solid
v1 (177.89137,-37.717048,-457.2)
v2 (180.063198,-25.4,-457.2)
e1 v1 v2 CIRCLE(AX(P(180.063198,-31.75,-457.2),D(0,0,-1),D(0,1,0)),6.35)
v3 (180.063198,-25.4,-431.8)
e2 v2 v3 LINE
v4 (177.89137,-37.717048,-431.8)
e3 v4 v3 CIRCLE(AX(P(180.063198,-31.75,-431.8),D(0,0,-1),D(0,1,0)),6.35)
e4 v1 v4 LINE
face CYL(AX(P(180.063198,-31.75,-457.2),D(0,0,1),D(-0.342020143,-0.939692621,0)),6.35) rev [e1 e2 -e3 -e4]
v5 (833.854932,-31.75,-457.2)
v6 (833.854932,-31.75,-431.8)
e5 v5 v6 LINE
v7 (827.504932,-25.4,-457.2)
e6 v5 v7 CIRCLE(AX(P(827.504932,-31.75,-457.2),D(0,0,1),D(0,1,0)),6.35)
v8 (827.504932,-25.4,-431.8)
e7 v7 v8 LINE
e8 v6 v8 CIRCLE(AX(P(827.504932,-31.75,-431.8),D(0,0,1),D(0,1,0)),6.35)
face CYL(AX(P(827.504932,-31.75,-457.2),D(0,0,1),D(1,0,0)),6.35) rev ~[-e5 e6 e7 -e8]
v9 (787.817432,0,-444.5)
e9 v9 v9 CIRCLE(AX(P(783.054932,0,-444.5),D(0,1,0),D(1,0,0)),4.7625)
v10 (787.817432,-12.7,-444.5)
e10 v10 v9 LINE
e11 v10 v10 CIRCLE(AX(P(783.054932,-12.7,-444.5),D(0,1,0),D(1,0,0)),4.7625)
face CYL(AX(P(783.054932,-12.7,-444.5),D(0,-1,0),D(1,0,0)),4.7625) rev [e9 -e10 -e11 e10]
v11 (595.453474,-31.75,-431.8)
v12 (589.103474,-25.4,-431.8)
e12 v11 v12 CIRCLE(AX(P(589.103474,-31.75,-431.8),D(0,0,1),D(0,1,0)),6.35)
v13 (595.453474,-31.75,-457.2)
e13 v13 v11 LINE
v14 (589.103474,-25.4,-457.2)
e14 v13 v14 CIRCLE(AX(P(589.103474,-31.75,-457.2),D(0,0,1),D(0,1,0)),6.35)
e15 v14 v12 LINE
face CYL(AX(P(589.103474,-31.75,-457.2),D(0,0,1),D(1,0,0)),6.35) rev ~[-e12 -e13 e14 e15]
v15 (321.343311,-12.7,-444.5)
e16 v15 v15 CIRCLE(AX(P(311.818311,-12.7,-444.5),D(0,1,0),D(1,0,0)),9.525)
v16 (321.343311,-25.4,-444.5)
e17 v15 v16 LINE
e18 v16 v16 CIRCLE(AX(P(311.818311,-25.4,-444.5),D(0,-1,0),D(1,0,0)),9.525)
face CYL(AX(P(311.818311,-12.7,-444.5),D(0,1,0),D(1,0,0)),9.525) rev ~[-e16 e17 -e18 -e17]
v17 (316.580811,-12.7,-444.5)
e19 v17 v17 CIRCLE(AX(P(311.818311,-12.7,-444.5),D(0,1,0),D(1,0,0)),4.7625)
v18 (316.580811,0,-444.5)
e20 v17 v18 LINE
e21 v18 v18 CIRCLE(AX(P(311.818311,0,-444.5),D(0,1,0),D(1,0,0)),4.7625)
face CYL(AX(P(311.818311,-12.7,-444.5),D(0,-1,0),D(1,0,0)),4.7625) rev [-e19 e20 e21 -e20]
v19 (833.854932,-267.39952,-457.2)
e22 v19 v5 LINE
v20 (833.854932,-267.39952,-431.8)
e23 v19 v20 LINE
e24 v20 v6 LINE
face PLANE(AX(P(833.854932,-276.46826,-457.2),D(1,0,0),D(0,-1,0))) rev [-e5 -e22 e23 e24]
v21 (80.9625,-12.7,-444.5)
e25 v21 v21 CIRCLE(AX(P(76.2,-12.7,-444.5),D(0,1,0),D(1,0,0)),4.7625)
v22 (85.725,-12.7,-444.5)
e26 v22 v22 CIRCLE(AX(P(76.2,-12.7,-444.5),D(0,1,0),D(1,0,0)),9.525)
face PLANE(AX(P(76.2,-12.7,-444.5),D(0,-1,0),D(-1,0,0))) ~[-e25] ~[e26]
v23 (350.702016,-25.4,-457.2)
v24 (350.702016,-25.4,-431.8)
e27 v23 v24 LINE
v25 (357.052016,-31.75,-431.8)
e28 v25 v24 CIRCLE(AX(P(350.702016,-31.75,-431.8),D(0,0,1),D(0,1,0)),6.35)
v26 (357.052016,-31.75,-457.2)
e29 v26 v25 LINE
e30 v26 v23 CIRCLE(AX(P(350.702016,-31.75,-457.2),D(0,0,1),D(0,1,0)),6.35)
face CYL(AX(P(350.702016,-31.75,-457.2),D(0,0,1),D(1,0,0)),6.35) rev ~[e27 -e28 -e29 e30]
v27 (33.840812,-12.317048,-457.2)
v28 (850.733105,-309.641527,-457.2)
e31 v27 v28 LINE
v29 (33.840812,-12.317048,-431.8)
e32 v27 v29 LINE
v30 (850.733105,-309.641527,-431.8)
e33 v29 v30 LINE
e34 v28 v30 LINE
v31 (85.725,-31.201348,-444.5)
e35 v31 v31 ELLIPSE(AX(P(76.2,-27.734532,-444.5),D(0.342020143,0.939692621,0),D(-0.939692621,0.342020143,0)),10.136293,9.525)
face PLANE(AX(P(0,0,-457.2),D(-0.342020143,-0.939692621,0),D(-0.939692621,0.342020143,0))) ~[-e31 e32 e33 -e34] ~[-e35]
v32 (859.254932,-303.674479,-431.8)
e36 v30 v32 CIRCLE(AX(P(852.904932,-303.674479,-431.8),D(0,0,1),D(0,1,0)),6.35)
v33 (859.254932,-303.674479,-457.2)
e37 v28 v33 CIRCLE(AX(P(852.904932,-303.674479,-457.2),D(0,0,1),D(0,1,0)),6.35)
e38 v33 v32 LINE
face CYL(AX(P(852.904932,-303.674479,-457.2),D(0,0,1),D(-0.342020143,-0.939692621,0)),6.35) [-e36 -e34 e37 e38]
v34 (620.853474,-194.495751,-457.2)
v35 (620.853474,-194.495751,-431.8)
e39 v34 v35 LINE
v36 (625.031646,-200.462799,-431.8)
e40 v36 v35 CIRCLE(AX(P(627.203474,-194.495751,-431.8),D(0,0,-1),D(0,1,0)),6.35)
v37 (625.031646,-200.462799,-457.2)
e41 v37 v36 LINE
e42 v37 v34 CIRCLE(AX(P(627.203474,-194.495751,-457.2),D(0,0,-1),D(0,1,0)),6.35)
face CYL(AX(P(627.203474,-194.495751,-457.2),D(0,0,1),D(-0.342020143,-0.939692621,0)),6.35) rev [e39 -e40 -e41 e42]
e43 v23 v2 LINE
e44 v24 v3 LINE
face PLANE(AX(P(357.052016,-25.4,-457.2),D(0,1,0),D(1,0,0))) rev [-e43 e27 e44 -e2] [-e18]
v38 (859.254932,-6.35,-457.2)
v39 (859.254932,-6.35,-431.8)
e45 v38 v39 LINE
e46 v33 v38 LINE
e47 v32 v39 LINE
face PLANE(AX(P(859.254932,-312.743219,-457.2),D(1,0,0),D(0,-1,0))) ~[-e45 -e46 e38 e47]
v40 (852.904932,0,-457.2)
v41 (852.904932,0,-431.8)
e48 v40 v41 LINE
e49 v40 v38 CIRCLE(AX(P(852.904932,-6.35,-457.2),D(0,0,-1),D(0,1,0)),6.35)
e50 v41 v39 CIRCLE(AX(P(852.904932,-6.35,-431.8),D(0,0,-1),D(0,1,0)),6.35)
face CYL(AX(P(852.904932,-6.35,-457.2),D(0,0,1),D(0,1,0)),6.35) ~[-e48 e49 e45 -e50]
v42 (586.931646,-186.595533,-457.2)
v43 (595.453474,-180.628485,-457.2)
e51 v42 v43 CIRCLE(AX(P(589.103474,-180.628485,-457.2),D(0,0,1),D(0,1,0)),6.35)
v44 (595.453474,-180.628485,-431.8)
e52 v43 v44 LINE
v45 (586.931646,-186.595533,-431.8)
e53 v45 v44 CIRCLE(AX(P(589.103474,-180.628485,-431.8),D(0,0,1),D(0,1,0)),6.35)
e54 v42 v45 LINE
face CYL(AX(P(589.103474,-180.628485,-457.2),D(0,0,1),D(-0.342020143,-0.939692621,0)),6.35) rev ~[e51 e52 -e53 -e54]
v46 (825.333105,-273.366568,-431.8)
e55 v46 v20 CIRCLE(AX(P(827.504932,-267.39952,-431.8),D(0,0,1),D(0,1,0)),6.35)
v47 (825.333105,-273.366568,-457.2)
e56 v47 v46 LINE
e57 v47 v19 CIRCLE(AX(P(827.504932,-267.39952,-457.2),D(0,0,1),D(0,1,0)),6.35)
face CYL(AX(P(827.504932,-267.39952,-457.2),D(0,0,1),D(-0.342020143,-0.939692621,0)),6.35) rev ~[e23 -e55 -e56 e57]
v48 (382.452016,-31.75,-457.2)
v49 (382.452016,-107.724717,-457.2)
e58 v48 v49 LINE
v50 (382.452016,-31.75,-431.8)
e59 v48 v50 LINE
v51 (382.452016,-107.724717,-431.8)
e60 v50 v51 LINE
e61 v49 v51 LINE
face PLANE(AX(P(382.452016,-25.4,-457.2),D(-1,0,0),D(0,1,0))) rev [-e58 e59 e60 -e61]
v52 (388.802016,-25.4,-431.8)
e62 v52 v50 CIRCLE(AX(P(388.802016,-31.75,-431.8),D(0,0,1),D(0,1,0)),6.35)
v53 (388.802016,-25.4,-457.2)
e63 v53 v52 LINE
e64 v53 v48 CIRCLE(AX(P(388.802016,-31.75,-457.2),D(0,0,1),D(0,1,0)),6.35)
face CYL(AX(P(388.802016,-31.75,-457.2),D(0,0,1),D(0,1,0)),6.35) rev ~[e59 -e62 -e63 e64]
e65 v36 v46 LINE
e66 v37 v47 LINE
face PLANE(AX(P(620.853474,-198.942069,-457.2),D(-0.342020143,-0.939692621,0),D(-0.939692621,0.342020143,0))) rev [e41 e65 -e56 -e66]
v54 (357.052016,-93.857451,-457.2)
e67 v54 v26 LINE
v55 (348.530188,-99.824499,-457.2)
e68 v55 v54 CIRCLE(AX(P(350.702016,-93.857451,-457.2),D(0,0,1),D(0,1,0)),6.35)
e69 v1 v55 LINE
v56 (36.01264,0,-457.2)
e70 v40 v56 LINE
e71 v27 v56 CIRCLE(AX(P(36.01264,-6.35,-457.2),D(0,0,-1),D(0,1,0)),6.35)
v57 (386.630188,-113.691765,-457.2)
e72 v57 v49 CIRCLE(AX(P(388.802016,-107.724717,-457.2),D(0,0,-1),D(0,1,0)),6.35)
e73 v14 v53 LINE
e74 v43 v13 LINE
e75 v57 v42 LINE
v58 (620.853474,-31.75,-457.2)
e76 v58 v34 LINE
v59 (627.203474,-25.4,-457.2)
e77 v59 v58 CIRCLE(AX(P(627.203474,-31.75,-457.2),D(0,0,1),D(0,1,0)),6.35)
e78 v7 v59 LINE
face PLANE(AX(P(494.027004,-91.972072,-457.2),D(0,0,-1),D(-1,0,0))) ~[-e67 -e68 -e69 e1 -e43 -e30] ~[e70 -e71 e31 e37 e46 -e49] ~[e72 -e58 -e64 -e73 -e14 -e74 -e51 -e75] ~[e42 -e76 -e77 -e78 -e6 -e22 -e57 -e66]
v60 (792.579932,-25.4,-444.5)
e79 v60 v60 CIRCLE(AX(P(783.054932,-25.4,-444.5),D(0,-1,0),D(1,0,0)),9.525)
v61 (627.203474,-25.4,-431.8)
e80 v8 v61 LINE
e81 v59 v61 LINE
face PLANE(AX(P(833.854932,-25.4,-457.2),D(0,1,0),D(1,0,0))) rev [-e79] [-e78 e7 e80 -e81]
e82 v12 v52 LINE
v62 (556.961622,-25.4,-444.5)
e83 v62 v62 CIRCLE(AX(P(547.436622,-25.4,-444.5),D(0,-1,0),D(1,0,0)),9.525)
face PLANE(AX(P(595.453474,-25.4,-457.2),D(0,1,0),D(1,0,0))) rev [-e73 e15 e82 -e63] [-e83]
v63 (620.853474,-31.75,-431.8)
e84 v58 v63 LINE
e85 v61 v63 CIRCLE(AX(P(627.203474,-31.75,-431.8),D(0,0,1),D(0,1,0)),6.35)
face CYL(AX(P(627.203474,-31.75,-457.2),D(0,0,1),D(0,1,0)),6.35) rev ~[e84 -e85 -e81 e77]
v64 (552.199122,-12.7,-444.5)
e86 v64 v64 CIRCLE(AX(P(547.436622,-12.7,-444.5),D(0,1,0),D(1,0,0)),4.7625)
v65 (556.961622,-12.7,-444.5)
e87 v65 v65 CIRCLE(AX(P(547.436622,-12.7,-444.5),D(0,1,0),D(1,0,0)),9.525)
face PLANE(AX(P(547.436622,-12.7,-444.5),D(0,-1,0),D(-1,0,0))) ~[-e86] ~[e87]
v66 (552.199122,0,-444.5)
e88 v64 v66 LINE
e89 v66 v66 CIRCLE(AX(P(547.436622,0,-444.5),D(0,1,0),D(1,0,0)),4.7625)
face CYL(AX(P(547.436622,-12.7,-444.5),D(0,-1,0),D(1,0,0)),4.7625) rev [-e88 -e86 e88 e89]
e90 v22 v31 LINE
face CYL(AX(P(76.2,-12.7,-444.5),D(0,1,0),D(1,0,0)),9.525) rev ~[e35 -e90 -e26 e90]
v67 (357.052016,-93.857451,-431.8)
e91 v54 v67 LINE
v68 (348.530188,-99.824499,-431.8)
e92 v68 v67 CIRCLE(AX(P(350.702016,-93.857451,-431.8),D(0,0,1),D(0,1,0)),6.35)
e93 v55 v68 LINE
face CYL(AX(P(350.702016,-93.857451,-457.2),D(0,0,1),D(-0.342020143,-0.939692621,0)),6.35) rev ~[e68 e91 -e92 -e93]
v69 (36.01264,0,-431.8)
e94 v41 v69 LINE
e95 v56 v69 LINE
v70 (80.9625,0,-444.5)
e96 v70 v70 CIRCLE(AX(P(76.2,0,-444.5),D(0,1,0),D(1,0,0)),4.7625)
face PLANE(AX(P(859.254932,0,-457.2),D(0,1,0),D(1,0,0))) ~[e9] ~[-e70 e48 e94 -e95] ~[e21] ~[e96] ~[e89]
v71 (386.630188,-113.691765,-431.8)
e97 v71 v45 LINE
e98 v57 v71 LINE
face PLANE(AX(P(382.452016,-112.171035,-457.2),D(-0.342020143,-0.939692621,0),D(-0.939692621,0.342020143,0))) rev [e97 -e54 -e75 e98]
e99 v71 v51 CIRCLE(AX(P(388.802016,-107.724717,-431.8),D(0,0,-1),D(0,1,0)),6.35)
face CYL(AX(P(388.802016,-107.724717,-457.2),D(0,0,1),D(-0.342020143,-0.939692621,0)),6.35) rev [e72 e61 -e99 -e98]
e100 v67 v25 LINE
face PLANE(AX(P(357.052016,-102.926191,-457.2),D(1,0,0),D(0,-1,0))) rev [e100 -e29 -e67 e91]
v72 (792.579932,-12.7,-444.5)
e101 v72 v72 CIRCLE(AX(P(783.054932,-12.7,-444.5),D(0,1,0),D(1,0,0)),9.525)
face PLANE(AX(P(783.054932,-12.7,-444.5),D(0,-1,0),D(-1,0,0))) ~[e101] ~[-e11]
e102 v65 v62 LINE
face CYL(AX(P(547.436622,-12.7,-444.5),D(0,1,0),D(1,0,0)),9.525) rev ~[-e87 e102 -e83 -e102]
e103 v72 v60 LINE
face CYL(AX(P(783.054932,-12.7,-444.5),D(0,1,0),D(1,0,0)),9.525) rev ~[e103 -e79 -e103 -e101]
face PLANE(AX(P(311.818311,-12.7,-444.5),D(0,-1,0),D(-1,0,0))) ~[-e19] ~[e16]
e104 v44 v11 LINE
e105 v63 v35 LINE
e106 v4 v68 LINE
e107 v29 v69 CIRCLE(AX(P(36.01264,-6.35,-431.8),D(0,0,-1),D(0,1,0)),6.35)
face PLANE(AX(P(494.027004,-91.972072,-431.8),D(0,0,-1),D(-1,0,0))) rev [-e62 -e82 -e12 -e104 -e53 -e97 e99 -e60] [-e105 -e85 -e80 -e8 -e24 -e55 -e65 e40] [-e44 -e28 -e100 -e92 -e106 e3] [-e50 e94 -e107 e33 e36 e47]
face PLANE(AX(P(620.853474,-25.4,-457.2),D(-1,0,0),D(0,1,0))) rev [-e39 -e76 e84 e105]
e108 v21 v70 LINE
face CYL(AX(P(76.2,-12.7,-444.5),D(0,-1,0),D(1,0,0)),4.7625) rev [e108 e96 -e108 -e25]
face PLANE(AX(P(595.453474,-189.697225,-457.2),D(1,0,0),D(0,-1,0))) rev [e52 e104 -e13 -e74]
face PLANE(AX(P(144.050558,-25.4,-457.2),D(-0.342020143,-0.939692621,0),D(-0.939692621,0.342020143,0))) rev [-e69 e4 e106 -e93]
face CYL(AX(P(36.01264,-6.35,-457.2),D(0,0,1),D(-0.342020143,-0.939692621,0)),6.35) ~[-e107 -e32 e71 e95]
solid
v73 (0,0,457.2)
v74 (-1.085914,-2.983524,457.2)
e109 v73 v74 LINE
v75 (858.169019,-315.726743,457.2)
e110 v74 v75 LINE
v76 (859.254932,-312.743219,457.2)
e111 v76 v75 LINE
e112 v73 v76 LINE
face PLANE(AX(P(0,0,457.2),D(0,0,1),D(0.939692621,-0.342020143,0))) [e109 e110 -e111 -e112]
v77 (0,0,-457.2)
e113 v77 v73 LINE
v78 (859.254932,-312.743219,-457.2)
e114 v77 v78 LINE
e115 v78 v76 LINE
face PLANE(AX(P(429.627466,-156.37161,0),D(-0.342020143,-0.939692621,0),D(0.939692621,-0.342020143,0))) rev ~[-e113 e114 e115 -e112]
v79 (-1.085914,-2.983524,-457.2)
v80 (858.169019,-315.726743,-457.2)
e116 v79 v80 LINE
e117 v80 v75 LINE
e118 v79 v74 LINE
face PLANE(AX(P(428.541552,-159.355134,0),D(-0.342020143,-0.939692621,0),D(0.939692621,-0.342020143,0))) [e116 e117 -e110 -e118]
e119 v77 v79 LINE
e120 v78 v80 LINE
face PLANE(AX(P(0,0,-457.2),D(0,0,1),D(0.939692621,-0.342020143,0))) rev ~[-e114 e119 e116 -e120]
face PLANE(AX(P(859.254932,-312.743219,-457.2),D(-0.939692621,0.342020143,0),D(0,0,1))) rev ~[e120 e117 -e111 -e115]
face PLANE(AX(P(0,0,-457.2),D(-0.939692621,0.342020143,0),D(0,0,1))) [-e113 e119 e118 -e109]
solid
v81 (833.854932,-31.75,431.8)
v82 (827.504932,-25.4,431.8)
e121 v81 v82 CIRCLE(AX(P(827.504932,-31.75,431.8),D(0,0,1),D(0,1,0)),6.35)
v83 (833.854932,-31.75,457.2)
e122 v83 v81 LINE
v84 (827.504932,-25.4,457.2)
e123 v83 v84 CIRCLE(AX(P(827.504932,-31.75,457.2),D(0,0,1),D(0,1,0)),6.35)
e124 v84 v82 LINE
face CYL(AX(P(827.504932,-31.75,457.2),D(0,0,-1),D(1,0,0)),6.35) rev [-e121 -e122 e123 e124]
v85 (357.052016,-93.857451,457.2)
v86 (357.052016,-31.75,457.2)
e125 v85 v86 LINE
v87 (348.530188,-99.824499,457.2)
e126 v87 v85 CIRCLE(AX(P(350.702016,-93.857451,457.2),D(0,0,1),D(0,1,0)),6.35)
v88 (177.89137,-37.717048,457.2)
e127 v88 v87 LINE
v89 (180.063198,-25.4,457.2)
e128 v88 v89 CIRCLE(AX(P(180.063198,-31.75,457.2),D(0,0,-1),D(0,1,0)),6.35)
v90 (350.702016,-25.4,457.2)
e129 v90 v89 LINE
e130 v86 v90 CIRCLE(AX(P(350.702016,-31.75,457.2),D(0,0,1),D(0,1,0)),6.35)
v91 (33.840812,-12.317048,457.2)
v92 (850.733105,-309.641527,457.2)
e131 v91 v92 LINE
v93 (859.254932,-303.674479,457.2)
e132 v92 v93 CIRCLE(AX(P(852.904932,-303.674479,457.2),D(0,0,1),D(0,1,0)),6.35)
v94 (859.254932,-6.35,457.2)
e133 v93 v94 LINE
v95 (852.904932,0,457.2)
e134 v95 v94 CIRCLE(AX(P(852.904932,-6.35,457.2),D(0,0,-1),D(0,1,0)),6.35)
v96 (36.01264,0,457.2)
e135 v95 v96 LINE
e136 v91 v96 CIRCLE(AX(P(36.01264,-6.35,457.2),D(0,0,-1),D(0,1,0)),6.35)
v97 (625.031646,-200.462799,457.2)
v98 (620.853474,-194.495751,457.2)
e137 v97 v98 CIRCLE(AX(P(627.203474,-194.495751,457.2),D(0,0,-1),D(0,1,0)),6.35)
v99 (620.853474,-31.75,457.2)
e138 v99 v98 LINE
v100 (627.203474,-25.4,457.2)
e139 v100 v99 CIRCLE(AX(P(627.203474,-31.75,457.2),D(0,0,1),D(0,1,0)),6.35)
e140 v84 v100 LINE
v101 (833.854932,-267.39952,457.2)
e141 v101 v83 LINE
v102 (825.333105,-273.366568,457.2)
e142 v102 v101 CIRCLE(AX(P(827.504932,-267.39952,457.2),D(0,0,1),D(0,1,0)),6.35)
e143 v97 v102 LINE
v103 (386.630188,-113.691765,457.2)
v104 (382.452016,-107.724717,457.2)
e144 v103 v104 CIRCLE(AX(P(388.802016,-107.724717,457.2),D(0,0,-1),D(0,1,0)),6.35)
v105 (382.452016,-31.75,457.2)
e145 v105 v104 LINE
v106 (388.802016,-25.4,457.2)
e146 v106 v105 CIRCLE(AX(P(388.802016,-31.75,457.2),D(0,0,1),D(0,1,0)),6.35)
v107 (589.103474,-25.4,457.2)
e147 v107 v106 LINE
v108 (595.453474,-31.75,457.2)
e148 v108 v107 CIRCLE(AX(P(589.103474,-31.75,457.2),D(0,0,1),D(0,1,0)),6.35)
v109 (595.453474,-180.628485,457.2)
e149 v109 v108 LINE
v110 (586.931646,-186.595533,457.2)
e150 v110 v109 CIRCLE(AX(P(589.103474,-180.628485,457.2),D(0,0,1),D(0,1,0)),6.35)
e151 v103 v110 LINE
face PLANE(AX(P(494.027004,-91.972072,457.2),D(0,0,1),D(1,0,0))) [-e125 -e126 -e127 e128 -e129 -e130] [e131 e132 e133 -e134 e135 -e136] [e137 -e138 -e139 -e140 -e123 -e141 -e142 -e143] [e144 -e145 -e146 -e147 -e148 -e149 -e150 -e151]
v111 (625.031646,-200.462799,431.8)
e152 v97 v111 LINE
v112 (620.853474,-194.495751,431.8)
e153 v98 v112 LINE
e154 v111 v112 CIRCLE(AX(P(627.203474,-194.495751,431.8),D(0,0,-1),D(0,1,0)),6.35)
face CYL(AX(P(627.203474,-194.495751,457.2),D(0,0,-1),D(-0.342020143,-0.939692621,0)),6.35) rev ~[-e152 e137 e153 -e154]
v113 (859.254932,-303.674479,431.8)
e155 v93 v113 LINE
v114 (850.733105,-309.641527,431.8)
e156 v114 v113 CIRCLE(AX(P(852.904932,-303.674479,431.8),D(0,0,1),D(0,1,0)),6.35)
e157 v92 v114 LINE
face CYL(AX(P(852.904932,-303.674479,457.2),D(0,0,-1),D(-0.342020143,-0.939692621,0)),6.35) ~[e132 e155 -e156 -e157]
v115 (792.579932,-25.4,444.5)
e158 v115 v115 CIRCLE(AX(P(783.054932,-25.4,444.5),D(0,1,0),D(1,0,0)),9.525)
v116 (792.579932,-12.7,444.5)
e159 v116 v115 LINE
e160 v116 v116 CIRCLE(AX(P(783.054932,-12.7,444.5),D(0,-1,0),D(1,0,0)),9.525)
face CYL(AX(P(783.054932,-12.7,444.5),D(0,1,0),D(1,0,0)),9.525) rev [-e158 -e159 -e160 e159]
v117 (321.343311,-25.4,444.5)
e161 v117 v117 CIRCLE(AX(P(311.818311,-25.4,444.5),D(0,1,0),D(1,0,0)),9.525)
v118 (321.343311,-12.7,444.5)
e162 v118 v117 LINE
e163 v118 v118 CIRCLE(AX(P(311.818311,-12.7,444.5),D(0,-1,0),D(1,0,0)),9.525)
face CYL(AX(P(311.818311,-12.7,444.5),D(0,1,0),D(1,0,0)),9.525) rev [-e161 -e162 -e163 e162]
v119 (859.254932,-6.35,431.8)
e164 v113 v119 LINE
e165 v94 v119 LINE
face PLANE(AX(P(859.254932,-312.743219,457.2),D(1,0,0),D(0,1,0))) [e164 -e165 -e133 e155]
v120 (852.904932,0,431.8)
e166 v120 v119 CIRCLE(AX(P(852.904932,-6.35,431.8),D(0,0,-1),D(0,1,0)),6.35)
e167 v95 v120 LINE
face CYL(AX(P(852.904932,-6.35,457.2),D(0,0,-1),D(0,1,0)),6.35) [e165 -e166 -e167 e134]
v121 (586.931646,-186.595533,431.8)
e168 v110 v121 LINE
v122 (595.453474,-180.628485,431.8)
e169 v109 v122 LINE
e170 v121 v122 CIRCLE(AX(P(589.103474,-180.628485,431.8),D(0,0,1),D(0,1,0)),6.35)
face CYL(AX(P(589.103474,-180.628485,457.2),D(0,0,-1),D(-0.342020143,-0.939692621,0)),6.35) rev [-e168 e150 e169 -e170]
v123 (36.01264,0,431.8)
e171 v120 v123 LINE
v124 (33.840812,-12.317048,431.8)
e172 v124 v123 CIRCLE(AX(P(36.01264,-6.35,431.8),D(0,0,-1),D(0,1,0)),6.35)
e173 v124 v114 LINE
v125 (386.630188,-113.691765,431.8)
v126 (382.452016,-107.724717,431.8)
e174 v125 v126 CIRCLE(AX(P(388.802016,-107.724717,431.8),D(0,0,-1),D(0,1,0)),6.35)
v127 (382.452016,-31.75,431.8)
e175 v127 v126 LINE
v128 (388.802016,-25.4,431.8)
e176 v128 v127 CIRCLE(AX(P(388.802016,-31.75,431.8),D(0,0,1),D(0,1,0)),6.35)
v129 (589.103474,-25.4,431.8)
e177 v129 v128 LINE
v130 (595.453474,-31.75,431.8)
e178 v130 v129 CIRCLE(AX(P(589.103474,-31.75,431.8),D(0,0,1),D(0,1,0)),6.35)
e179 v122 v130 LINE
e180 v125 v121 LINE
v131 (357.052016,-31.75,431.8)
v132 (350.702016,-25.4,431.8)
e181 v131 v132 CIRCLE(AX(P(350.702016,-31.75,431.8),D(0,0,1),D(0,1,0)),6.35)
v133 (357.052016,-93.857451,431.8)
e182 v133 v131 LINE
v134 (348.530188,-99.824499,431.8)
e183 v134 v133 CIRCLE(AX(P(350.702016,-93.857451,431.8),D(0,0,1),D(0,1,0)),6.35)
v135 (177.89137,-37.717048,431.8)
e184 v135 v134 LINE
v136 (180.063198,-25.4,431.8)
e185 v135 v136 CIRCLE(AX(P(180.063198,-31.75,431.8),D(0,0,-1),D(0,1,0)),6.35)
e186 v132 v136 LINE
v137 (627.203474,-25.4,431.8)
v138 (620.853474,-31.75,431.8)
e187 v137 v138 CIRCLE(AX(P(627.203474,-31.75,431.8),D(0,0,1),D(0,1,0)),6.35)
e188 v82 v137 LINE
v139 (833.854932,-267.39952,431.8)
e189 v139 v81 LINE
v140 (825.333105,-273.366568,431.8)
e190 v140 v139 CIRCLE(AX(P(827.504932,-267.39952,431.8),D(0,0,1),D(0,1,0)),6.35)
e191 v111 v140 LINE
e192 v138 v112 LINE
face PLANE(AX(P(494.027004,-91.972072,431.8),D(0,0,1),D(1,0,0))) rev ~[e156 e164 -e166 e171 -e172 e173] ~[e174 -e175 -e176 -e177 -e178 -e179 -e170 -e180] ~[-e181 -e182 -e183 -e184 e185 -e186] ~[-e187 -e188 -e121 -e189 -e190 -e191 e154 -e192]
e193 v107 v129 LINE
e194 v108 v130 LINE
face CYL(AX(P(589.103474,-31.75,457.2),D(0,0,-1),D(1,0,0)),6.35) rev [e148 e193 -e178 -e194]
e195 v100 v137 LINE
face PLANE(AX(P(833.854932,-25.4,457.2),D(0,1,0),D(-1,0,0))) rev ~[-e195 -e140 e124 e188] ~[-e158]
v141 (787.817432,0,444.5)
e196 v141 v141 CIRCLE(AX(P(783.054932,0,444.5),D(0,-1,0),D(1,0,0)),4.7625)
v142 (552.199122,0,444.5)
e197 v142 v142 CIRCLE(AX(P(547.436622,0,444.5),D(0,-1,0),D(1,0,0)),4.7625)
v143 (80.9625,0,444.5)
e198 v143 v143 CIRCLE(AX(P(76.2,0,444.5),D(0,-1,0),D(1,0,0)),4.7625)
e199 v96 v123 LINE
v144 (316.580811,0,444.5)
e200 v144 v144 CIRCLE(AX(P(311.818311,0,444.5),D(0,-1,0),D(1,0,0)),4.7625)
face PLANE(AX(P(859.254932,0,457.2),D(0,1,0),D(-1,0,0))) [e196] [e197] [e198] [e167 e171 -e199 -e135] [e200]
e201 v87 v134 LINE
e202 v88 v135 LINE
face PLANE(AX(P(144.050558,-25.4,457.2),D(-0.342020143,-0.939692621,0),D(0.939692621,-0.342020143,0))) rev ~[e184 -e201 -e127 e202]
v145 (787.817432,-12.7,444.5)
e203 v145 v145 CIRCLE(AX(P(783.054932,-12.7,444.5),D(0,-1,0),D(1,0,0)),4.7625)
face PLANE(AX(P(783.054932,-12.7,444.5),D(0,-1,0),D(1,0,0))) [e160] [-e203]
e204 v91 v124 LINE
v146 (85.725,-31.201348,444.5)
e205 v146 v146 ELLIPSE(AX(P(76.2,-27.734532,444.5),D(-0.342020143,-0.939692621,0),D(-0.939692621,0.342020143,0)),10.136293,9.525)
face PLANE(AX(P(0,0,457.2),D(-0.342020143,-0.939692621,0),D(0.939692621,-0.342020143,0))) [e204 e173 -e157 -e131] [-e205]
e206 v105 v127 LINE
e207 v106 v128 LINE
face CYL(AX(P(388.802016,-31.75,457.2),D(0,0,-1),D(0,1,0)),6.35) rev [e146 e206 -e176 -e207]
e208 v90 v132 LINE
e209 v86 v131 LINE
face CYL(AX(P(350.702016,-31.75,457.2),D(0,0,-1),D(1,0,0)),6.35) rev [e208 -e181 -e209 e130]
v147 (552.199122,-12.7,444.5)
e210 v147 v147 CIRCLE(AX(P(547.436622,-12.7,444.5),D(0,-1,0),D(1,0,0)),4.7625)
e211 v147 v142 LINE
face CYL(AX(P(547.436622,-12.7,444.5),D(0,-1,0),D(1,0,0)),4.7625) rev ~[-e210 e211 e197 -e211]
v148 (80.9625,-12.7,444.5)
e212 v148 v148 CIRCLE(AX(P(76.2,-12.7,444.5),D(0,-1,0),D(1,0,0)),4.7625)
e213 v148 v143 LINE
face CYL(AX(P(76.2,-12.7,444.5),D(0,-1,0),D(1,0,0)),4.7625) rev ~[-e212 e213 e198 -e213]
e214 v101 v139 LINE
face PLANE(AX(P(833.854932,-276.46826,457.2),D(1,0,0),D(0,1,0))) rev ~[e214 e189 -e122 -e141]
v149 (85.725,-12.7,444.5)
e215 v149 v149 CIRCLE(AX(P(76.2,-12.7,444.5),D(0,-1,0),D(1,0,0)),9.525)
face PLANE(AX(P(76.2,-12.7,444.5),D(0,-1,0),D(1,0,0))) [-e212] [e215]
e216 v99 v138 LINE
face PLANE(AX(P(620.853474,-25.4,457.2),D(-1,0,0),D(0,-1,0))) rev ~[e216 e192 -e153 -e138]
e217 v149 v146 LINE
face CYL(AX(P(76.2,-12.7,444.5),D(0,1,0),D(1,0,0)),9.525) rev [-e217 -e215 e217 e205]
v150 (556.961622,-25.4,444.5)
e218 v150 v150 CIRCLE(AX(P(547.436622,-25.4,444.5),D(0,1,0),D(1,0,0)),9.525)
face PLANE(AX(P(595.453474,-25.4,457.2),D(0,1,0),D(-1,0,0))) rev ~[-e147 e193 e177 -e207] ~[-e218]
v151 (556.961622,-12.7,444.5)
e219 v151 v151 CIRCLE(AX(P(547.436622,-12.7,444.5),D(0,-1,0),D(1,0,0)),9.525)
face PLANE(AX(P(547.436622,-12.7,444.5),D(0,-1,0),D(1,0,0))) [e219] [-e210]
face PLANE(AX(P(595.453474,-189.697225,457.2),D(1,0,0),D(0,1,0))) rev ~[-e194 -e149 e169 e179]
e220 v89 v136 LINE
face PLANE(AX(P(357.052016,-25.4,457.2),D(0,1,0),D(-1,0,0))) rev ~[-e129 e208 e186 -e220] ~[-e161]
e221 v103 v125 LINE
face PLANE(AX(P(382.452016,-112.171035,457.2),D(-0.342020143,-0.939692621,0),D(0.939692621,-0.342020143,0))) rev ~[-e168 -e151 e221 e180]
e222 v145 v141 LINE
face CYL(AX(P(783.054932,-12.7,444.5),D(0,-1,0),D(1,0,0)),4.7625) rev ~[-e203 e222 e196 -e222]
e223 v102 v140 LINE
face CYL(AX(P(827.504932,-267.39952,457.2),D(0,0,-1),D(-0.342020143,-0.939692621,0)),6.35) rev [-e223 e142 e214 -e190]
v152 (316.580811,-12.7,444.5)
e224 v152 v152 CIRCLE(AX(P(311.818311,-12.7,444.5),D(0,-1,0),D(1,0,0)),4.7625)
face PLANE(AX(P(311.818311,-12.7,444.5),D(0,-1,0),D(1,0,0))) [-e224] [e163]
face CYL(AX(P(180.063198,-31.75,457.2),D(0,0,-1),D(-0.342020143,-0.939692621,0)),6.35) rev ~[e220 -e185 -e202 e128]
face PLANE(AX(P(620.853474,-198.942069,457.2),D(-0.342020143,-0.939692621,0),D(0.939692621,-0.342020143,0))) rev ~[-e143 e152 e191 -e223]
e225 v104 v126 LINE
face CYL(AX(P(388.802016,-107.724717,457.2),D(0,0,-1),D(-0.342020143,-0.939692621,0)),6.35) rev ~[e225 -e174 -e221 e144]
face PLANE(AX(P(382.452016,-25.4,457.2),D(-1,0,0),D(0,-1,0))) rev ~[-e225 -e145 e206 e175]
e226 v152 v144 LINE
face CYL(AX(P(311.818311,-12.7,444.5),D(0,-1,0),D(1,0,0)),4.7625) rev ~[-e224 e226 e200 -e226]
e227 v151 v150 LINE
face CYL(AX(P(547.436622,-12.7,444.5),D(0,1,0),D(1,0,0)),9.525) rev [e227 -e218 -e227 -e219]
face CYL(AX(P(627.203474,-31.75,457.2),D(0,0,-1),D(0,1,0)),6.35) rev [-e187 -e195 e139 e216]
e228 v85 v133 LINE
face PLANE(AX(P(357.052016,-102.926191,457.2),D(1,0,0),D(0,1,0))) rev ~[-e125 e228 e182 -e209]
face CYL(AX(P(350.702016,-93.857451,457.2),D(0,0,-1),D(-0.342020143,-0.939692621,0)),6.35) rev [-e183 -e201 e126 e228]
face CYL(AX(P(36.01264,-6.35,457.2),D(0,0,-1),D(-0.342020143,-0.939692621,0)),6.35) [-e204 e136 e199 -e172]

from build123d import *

# Parameters (mm, degrees)
F4_DEPTH  = 25.4
F6_DEPTH  = 25.401
F7_R      = 6.35
F8_R      = 6.35
F10_R     = 9.525
F10_R_2   = 4.7625
F11_DEPTH = 38.1
F12_DEPTH = 12.701
F14_W     = 914.4
F14_H     = 914.4
F15_DEPTH = 3.175


with BuildPart() as f4:
    # F3 (on offset) → F4 (new body)
    with BuildSketch(Plane.XY.offset(457.2)):
        Polygon((0, 0), (859.2549324466, -312.743219057), (859.2549324466, 0), align=None)
    extrude(amount=-F4_DEPTH)

    # F5 (on face) → F6 (cut, through all)
    with BuildSketch(Plane.XY.offset(457.2)):
        Polygon((144.0505582183, -25.4), (357.0520162944, -102.926190595), (357.0520162944, -25.4), align=None)
        Polygon((382.4520162944, -112.1710345454), (595.4534743705, -189.6972251404), (595.4534743705, -25.4), (382.4520162944, -25.4), align=None)
        Polygon((620.8534743705, -198.9420690907), (833.8549324466, -276.4682596857), (833.8549324466, -25.4), (620.8534743705, -25.4), align=None)
    extrude(amount=-F6_DEPTH, mode=Mode.SUBTRACT)

    # F7
    f7_edges = [f4.edges().sort_by_distance(p)[0] for p in [
        (0, 0, 444.5),
        (859.254932, -312.743219, 444.5),
        (859.254932, 0, 444.5),
    ]]
    fillet(f7_edges, radius=F7_R)

    # F8
    f8_edges = [f4.edges().sort_by_distance(p)[0] for p in [
        (144.050558, -25.4, 444.5),
        (382.452016, -112.171035, 444.5),
        (382.452016, -25.4, 444.5),
        (620.853474, -25.4, 444.5),
        (620.853474, -198.942069, 444.5),
        (357.052016, -25.4, 444.5),
        (595.453474, -25.4, 444.5),
        (833.854932, -25.4, 444.5),
        (357.052016, -102.926191, 444.5),
        (595.453474, -189.697225, 444.5),
        (833.854932, -276.46826, 444.5),
    ]]
    fillet(f8_edges, radius=F8_R)

    # F10 (on offset) → F11 (cut)
    with BuildSketch(Plane.XZ.offset(12.7)):
        with Locations((76.2, 444.5)):
            Circle(F10_R)
        with Locations((76.2, 444.5)):
            Circle(F10_R_2, mode=Mode.SUBTRACT)
        with Locations((311.8183108155, 444.5)):
            Circle(F10_R)
        with Locations((311.8183108155, 444.5)):
            Circle(F10_R_2, mode=Mode.SUBTRACT)
        with Locations((547.4366216311, 444.5)):
            Circle(F10_R)
        with Locations((547.4366216311, 444.5)):
            Circle(F10_R_2, mode=Mode.SUBTRACT)
        with Locations((783.0549324466, 444.5)):
            Circle(F10_R)
        with Locations((783.0549324466, 444.5)):
            Circle(F10_R_2, mode=Mode.SUBTRACT)
        with Locations((76.2, 444.5)):
            Circle(F10_R_2)
        with Locations((311.8183108155, 444.5)):
            Circle(F10_R_2)
        with Locations((547.4366216311, 444.5)):
            Circle(F10_R_2)
        with Locations((783.0549324466, 444.5)):
            Circle(F10_R_2)
    extrude(amount=F11_DEPTH, mode=Mode.SUBTRACT)

    # F10 (on offset) → F12 (cut, through all)
    with BuildSketch(Plane.XZ.offset(12.7)):
        with Locations((76.2, 444.5)):
            Circle(F10_R_2)
        with Locations((311.8183108155, 444.5)):
            Circle(F10_R_2)
        with Locations((547.4366216311, 444.5)):
            Circle(F10_R_2)
        with Locations((783.0549324466, 444.5)):
            Circle(F10_R_2)
    extrude(amount=-F12_DEPTH, mode=Mode.SUBTRACT)


with BuildPart() as f13_1:
    # F13: instance of F4
    add(f4.part.mirror(Plane.XY))


with BuildPart() as f15:
    # F14 (on face) → F15 (new body)
    with BuildSketch(Plane(origin=(0, 0, 0), x_dir=(0.9396926208, -0.3420201433, 0), z_dir=(-0.3420201433, -0.9396926208, 0))):
        with Locations((457.2, 0)):
            Rectangle(F14_W, F14_H)
    extrude(amount=F15_DEPTH)


solid = Compound([f4.part, f13_1.part, f15.part])
